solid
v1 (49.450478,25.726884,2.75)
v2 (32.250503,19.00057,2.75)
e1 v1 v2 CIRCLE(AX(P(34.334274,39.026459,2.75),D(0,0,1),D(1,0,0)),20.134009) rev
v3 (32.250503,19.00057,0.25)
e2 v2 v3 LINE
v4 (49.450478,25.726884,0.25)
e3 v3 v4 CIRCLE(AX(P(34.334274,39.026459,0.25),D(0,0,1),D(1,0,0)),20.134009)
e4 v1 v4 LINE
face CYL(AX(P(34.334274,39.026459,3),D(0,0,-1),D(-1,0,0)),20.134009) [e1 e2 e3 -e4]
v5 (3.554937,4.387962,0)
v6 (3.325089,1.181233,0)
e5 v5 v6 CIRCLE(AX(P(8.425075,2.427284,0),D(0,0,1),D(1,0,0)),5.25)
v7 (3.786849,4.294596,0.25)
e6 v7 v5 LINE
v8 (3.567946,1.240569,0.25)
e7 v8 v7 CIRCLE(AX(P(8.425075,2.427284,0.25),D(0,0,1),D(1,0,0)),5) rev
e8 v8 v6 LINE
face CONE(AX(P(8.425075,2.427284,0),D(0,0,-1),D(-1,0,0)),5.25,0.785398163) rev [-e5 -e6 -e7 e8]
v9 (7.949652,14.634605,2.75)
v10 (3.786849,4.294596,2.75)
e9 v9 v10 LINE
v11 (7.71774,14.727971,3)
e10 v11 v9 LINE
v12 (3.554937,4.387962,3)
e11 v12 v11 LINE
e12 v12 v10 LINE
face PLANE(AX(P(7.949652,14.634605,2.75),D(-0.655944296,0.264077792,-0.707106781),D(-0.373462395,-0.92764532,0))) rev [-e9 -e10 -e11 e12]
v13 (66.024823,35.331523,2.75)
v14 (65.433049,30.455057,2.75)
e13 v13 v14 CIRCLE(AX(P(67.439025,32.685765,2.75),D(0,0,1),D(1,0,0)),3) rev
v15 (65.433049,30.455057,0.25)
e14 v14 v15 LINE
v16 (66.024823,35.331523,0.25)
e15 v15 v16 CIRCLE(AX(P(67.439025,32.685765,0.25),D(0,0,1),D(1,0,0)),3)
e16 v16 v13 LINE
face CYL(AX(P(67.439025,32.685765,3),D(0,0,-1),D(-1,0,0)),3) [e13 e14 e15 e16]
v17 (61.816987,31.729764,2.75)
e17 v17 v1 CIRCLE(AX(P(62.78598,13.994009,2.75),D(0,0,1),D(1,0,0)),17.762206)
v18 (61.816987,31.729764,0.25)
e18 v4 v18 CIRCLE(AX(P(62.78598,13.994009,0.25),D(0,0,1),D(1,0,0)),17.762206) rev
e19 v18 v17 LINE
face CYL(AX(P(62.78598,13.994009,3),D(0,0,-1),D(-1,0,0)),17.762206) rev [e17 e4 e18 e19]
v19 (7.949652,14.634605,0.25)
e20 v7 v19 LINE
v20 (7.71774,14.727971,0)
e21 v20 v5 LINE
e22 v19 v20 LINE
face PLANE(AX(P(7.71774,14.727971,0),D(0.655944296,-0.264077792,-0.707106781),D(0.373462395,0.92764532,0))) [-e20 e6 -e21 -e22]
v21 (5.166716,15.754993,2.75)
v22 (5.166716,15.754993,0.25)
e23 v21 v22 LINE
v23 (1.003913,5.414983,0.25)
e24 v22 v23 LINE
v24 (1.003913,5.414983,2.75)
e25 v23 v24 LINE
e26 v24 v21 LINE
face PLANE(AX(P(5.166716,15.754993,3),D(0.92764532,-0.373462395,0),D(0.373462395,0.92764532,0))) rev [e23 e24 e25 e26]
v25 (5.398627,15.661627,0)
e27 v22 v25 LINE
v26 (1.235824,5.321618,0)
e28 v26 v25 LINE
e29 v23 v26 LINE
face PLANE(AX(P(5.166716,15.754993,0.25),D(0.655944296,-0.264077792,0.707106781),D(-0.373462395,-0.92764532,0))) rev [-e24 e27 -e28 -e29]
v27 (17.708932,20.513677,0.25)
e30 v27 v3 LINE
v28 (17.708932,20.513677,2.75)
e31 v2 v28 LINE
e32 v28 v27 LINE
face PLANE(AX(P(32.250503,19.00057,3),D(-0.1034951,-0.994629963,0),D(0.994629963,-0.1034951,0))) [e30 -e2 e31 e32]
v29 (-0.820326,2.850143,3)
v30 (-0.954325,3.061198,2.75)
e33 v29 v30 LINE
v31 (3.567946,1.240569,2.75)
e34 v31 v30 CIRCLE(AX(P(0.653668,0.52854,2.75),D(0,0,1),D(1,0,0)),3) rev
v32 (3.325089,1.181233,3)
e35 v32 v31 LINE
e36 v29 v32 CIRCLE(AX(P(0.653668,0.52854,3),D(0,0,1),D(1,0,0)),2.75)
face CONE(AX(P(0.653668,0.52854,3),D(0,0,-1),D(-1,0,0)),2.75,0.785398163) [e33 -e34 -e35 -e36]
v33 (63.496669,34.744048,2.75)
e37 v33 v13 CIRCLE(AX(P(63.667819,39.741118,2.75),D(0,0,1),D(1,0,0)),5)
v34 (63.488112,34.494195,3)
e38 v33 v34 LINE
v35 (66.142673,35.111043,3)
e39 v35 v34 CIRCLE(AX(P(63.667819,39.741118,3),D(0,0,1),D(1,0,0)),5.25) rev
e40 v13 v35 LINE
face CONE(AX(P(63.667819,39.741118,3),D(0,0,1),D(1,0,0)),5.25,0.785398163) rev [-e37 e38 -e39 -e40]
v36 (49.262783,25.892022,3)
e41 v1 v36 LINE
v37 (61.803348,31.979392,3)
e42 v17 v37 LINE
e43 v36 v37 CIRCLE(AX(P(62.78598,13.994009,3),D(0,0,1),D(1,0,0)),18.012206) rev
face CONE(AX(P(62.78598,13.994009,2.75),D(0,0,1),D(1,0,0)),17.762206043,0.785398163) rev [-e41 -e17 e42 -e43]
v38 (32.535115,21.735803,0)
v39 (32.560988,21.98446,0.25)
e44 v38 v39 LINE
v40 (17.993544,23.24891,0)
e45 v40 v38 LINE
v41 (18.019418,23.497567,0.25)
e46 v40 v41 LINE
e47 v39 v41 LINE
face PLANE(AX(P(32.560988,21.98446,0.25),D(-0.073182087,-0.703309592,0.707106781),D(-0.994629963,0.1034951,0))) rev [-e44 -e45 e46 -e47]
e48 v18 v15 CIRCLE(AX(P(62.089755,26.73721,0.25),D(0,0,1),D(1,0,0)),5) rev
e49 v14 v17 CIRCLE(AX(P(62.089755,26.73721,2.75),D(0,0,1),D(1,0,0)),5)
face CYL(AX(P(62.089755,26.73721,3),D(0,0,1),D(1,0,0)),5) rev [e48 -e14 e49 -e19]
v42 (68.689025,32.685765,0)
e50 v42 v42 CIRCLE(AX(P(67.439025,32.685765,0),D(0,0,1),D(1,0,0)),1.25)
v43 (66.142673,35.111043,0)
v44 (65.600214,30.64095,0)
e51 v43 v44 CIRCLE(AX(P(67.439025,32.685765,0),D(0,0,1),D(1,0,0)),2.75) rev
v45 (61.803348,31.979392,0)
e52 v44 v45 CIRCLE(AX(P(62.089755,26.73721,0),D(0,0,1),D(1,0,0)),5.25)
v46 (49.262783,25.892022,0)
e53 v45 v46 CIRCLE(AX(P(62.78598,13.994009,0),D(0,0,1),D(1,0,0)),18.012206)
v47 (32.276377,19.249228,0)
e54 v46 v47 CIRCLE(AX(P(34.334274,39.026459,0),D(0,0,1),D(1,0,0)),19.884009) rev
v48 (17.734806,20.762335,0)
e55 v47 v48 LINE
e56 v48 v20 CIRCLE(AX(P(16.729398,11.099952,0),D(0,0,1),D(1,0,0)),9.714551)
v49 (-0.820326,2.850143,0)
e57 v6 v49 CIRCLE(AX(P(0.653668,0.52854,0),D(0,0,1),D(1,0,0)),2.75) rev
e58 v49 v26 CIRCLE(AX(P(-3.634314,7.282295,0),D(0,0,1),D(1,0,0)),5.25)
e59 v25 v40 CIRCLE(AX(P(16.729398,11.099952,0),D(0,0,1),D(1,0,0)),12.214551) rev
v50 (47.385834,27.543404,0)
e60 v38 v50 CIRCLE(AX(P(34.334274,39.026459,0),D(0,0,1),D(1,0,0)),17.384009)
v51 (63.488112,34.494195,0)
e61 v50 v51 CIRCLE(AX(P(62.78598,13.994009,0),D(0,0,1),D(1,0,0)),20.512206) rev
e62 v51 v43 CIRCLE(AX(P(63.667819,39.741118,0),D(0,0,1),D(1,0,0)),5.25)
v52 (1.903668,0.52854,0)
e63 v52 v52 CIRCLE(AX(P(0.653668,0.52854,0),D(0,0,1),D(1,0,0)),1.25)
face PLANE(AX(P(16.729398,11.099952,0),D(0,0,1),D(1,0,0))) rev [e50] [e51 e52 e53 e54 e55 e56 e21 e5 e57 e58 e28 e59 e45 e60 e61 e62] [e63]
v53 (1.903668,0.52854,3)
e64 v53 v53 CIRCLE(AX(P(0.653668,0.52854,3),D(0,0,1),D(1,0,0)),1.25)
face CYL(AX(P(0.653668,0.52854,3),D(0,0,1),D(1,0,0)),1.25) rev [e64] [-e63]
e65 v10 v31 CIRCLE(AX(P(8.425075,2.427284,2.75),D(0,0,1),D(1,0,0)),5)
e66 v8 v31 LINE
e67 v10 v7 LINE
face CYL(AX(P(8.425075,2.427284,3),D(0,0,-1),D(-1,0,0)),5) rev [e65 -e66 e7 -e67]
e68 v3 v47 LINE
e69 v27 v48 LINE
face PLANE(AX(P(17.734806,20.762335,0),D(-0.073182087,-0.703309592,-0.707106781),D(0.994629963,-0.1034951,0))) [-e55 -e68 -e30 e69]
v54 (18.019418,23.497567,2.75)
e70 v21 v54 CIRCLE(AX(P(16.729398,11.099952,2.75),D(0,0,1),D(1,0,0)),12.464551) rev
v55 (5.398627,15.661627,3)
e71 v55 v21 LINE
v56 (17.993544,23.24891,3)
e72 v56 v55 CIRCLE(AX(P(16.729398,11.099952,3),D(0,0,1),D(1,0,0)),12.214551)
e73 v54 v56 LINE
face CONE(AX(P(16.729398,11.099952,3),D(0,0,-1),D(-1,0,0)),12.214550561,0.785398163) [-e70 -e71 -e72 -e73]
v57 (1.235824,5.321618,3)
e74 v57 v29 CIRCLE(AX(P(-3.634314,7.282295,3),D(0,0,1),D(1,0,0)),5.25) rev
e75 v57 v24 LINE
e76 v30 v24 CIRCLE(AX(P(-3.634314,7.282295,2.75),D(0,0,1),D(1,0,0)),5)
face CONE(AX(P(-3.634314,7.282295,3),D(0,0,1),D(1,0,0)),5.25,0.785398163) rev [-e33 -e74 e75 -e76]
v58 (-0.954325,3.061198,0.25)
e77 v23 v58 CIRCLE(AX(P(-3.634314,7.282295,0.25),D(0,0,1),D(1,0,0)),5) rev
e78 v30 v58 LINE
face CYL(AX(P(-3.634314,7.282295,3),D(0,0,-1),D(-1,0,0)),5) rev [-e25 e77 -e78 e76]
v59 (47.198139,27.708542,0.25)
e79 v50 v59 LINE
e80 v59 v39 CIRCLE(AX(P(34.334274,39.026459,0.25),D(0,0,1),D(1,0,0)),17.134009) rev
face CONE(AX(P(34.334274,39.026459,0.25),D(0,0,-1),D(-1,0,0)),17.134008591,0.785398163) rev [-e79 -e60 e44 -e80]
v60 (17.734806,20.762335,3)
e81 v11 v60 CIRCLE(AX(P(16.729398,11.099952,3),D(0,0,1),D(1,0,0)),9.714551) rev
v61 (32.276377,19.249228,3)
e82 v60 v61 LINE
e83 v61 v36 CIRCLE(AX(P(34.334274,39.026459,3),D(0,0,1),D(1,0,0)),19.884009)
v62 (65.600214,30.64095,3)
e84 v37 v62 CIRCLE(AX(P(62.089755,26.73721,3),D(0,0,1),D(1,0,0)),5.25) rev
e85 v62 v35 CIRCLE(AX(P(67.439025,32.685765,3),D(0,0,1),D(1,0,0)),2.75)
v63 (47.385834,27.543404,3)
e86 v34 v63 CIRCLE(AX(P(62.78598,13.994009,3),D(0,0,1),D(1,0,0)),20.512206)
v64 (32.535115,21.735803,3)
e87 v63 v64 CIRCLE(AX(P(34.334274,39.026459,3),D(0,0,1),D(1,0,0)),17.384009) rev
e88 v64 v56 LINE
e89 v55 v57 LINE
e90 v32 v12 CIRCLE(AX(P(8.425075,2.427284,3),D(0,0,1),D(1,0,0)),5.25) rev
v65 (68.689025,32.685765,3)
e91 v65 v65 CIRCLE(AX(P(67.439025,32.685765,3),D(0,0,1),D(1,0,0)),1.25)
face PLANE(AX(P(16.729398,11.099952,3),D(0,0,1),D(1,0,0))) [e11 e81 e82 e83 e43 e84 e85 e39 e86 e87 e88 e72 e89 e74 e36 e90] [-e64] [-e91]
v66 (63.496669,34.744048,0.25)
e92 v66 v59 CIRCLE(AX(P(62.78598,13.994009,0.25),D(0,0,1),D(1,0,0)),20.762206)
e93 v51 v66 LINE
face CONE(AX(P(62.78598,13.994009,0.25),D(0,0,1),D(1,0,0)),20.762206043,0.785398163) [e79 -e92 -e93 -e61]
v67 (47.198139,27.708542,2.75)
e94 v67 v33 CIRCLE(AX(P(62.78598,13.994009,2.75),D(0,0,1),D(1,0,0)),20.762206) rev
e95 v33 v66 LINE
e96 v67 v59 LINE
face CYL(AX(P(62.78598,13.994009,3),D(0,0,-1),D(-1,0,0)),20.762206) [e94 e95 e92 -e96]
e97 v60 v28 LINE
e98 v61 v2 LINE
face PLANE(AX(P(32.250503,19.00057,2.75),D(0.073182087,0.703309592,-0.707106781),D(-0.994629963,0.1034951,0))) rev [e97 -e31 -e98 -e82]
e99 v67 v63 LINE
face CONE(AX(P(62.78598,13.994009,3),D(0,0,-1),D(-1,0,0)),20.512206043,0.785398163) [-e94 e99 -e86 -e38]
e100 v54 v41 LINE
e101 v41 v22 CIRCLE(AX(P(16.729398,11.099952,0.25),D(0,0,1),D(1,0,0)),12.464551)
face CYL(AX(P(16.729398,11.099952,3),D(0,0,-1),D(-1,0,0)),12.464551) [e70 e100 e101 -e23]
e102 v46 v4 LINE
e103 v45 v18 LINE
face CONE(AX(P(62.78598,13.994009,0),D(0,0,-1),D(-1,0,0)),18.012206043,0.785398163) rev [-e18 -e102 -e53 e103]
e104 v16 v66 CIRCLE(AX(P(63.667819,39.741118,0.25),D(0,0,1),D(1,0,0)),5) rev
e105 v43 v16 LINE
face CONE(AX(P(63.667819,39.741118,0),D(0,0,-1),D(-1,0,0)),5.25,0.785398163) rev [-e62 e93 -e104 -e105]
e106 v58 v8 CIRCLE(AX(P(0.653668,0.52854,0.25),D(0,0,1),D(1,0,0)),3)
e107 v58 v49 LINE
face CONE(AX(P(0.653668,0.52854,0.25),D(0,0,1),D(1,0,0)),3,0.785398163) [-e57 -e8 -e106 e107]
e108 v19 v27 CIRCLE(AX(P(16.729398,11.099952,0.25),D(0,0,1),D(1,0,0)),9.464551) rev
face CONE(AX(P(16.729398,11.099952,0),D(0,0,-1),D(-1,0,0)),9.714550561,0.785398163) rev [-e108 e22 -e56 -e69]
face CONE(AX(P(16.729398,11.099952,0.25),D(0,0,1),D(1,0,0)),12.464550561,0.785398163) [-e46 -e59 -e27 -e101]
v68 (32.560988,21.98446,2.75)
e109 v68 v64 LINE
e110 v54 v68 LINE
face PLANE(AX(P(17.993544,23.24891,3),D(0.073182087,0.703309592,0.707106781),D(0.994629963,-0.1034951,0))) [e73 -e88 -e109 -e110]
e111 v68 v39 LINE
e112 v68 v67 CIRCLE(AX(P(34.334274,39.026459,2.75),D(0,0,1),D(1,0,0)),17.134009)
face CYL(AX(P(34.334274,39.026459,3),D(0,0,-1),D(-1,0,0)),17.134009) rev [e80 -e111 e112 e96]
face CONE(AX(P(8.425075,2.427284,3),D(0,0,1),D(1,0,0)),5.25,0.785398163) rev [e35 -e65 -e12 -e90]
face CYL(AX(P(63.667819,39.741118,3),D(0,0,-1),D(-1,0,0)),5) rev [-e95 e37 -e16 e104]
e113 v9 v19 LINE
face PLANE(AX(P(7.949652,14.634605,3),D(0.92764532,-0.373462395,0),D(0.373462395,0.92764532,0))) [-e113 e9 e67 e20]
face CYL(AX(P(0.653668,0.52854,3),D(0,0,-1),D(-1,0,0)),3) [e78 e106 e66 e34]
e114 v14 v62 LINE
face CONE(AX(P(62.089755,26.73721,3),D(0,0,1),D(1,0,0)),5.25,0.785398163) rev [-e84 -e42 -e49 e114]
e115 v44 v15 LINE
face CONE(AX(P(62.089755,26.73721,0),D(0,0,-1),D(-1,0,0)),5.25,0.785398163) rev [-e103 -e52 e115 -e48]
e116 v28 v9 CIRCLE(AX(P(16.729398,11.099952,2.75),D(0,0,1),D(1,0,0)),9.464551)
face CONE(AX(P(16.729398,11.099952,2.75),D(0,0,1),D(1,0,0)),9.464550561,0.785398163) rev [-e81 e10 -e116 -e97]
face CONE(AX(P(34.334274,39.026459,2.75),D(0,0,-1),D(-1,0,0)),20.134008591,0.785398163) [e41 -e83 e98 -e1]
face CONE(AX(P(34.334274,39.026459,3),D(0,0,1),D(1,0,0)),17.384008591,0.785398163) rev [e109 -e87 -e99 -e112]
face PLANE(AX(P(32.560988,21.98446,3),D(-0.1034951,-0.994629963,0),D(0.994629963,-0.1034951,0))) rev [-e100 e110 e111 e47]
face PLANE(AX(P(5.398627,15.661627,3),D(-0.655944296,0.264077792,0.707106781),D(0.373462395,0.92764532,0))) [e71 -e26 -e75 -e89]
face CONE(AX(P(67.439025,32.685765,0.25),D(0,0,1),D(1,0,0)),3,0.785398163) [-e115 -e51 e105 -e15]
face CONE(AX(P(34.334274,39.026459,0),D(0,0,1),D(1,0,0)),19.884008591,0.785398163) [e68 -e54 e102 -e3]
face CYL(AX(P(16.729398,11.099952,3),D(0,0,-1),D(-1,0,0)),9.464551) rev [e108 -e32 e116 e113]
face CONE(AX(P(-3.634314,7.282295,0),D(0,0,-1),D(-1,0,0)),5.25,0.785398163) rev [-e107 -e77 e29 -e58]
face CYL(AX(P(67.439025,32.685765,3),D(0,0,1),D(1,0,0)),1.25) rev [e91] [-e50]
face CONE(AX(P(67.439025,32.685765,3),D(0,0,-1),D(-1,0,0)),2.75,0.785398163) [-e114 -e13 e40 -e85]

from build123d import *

# Parameters (mm, degrees)
EXTRUDE_THIN1_DEPTH   = 3
SKETCH1_3_R           = 3
BOSS_EXTRUDE1_DEPTH   = 3
FILLET1_R             = 5
F_2_5MM_DOWEL_HOLE1_D = 2.5
CHAMFER1_SIZE         = 0.25


with BuildPart() as part:
    # Sketch1 → Extrude-Thin1 (new body)
    with BuildSketch(Plane.XY):
        with BuildLine():
            ThreePointArc((67.801370449, 34.141342947), (56.598136233, 33.812681852), (47.198138914, 27.708541828))
            ThreePointArc((47.198138914, 27.708541828), (40.574587763, 23.069242721), (32.560988498, 21.984460302))
            Line((32.560988498, 21.984460302), (18.0194176, 23.497567077))
            ThreePointArc((18.0194176, 23.497567077), (10.297542455, 21.776854665), (5.1667157, 15.754992513))
            Line((5.1667157, 15.754992513), (-0.737799909, 1.088733357))
            Line((-0.737799909, 1.088733357), (2.04513605, -0.031653828))
            Line((2.04513605, -0.031653828), (7.949651659, 14.634605328))
            ThreePointArc((7.949651659, 14.634605328), (11.845577871, 19.207110251), (17.7089323, 20.513677186))
            Line((17.7089323, 20.513677186), (32.250503198, 19.000570412))
            ThreePointArc((32.250503198, 19.000570412), (41.667206568, 20.275287791), (49.450477778, 25.726883522))
            ThreePointArc((49.450477778, 25.726883522), (57.492238313, 30.949016112), (67.076680067, 31.230187876))
            Line((67.076680067, 31.230187876), (67.801370449, 34.141342947))
        make_face()
    extrude(amount=EXTRUDE_THIN1_DEPTH)

    # Sketch1<3> → Boss-Extrude1 (add, through all)
    with BuildSketch(Plane.XY):
        with Locations((0.653668071, 0.528539764)):
            Circle(SKETCH1_3_R)
        with Locations((67.439025258, 32.685765412)):
            Circle(SKETCH1_3_R)
    extrude(amount=BOSS_EXTRUDE1_DEPTH)

    # Fillet1
    fillet1_edges = [part.edges().sort_by_distance(p)[0] for p in [
        (0.232483855, 3.498826595, 1.5),
        (3.015419815, 2.37843941, 1.5),
        (64.619351463, 31.661343773, 1.5),
        (65.147115394, 34.621520866, 1.5),
    ]]
    fillet(fillet1_edges, radius=FILLET1_R)

    # Ø2.5mm Dowel Hole1 (through all)
    with Locations(Plane.XY.offset(3)):
        with Locations((67.439025258, 32.685765412), (0.653668071, 0.528539764)):
            Hole(F_2_5MM_DOWEL_HOLE1_D / 2)

    # Chamfer1
    chamfer1_edges = [part.edges().sort_by_distance(p)[0] for p in [
        (10.297542455, 21.776854665, 0),
        (25.290203049, 22.741013689, 0),
        (40.574587763, 23.069242721, 0),
        (41.667206568, 20.275287791, 0),
        (24.979717749, 19.757123799, 0),
        (5.868250185, 9.464600631, 3),
        (11.845577871, 19.207110251, 0),
        (5.868250185, 9.464600631, 0),
        (3.085314225, 10.584987816, 0),
        (11.845577871, 19.207110251, 3),
        (24.979717749, 19.757123799, 3),
        (41.667206568, 20.275287791, 3),
        (40.574587763, 23.069242721, 3),
        (25.290203049, 22.741013689, 3),
        (10.297542455, 21.776854665, 3),
        (3.085314225, 10.584987816, 3),
        (55.029480027, 29.973141473, 0),
        (55.029480027, 29.973141473, 3),
        (70.417176443, 32.324357726, 0),
        (70.417176443, 32.324357726, 3),
        (54.557553661, 33.056070888, 0),
        (54.557553661, 33.056070888, 3),
        (-0.466719115, -2.254396195, 3),
        (-0.466719115, -2.254396195, 0),
        (63.752058153, 31.452795933, 3),
        (63.752058153, 31.452795933, 0),
        (64.7995305, 34.870879047, 3),
        (64.7995305, 34.870879047, 0),
        (3.437869945, 2.784750939, 0),
        (3.437869945, 2.784750939, 3),
        (0.209401135, 4.084505995, 0),
        (0.209401135, 4.084505995, 3),
    ]]
    chamfer(chamfer1_edges, length=CHAMFER1_SIZE - 0.0001)  # a hair under: the kernel refuses the full size


solid = part.part
